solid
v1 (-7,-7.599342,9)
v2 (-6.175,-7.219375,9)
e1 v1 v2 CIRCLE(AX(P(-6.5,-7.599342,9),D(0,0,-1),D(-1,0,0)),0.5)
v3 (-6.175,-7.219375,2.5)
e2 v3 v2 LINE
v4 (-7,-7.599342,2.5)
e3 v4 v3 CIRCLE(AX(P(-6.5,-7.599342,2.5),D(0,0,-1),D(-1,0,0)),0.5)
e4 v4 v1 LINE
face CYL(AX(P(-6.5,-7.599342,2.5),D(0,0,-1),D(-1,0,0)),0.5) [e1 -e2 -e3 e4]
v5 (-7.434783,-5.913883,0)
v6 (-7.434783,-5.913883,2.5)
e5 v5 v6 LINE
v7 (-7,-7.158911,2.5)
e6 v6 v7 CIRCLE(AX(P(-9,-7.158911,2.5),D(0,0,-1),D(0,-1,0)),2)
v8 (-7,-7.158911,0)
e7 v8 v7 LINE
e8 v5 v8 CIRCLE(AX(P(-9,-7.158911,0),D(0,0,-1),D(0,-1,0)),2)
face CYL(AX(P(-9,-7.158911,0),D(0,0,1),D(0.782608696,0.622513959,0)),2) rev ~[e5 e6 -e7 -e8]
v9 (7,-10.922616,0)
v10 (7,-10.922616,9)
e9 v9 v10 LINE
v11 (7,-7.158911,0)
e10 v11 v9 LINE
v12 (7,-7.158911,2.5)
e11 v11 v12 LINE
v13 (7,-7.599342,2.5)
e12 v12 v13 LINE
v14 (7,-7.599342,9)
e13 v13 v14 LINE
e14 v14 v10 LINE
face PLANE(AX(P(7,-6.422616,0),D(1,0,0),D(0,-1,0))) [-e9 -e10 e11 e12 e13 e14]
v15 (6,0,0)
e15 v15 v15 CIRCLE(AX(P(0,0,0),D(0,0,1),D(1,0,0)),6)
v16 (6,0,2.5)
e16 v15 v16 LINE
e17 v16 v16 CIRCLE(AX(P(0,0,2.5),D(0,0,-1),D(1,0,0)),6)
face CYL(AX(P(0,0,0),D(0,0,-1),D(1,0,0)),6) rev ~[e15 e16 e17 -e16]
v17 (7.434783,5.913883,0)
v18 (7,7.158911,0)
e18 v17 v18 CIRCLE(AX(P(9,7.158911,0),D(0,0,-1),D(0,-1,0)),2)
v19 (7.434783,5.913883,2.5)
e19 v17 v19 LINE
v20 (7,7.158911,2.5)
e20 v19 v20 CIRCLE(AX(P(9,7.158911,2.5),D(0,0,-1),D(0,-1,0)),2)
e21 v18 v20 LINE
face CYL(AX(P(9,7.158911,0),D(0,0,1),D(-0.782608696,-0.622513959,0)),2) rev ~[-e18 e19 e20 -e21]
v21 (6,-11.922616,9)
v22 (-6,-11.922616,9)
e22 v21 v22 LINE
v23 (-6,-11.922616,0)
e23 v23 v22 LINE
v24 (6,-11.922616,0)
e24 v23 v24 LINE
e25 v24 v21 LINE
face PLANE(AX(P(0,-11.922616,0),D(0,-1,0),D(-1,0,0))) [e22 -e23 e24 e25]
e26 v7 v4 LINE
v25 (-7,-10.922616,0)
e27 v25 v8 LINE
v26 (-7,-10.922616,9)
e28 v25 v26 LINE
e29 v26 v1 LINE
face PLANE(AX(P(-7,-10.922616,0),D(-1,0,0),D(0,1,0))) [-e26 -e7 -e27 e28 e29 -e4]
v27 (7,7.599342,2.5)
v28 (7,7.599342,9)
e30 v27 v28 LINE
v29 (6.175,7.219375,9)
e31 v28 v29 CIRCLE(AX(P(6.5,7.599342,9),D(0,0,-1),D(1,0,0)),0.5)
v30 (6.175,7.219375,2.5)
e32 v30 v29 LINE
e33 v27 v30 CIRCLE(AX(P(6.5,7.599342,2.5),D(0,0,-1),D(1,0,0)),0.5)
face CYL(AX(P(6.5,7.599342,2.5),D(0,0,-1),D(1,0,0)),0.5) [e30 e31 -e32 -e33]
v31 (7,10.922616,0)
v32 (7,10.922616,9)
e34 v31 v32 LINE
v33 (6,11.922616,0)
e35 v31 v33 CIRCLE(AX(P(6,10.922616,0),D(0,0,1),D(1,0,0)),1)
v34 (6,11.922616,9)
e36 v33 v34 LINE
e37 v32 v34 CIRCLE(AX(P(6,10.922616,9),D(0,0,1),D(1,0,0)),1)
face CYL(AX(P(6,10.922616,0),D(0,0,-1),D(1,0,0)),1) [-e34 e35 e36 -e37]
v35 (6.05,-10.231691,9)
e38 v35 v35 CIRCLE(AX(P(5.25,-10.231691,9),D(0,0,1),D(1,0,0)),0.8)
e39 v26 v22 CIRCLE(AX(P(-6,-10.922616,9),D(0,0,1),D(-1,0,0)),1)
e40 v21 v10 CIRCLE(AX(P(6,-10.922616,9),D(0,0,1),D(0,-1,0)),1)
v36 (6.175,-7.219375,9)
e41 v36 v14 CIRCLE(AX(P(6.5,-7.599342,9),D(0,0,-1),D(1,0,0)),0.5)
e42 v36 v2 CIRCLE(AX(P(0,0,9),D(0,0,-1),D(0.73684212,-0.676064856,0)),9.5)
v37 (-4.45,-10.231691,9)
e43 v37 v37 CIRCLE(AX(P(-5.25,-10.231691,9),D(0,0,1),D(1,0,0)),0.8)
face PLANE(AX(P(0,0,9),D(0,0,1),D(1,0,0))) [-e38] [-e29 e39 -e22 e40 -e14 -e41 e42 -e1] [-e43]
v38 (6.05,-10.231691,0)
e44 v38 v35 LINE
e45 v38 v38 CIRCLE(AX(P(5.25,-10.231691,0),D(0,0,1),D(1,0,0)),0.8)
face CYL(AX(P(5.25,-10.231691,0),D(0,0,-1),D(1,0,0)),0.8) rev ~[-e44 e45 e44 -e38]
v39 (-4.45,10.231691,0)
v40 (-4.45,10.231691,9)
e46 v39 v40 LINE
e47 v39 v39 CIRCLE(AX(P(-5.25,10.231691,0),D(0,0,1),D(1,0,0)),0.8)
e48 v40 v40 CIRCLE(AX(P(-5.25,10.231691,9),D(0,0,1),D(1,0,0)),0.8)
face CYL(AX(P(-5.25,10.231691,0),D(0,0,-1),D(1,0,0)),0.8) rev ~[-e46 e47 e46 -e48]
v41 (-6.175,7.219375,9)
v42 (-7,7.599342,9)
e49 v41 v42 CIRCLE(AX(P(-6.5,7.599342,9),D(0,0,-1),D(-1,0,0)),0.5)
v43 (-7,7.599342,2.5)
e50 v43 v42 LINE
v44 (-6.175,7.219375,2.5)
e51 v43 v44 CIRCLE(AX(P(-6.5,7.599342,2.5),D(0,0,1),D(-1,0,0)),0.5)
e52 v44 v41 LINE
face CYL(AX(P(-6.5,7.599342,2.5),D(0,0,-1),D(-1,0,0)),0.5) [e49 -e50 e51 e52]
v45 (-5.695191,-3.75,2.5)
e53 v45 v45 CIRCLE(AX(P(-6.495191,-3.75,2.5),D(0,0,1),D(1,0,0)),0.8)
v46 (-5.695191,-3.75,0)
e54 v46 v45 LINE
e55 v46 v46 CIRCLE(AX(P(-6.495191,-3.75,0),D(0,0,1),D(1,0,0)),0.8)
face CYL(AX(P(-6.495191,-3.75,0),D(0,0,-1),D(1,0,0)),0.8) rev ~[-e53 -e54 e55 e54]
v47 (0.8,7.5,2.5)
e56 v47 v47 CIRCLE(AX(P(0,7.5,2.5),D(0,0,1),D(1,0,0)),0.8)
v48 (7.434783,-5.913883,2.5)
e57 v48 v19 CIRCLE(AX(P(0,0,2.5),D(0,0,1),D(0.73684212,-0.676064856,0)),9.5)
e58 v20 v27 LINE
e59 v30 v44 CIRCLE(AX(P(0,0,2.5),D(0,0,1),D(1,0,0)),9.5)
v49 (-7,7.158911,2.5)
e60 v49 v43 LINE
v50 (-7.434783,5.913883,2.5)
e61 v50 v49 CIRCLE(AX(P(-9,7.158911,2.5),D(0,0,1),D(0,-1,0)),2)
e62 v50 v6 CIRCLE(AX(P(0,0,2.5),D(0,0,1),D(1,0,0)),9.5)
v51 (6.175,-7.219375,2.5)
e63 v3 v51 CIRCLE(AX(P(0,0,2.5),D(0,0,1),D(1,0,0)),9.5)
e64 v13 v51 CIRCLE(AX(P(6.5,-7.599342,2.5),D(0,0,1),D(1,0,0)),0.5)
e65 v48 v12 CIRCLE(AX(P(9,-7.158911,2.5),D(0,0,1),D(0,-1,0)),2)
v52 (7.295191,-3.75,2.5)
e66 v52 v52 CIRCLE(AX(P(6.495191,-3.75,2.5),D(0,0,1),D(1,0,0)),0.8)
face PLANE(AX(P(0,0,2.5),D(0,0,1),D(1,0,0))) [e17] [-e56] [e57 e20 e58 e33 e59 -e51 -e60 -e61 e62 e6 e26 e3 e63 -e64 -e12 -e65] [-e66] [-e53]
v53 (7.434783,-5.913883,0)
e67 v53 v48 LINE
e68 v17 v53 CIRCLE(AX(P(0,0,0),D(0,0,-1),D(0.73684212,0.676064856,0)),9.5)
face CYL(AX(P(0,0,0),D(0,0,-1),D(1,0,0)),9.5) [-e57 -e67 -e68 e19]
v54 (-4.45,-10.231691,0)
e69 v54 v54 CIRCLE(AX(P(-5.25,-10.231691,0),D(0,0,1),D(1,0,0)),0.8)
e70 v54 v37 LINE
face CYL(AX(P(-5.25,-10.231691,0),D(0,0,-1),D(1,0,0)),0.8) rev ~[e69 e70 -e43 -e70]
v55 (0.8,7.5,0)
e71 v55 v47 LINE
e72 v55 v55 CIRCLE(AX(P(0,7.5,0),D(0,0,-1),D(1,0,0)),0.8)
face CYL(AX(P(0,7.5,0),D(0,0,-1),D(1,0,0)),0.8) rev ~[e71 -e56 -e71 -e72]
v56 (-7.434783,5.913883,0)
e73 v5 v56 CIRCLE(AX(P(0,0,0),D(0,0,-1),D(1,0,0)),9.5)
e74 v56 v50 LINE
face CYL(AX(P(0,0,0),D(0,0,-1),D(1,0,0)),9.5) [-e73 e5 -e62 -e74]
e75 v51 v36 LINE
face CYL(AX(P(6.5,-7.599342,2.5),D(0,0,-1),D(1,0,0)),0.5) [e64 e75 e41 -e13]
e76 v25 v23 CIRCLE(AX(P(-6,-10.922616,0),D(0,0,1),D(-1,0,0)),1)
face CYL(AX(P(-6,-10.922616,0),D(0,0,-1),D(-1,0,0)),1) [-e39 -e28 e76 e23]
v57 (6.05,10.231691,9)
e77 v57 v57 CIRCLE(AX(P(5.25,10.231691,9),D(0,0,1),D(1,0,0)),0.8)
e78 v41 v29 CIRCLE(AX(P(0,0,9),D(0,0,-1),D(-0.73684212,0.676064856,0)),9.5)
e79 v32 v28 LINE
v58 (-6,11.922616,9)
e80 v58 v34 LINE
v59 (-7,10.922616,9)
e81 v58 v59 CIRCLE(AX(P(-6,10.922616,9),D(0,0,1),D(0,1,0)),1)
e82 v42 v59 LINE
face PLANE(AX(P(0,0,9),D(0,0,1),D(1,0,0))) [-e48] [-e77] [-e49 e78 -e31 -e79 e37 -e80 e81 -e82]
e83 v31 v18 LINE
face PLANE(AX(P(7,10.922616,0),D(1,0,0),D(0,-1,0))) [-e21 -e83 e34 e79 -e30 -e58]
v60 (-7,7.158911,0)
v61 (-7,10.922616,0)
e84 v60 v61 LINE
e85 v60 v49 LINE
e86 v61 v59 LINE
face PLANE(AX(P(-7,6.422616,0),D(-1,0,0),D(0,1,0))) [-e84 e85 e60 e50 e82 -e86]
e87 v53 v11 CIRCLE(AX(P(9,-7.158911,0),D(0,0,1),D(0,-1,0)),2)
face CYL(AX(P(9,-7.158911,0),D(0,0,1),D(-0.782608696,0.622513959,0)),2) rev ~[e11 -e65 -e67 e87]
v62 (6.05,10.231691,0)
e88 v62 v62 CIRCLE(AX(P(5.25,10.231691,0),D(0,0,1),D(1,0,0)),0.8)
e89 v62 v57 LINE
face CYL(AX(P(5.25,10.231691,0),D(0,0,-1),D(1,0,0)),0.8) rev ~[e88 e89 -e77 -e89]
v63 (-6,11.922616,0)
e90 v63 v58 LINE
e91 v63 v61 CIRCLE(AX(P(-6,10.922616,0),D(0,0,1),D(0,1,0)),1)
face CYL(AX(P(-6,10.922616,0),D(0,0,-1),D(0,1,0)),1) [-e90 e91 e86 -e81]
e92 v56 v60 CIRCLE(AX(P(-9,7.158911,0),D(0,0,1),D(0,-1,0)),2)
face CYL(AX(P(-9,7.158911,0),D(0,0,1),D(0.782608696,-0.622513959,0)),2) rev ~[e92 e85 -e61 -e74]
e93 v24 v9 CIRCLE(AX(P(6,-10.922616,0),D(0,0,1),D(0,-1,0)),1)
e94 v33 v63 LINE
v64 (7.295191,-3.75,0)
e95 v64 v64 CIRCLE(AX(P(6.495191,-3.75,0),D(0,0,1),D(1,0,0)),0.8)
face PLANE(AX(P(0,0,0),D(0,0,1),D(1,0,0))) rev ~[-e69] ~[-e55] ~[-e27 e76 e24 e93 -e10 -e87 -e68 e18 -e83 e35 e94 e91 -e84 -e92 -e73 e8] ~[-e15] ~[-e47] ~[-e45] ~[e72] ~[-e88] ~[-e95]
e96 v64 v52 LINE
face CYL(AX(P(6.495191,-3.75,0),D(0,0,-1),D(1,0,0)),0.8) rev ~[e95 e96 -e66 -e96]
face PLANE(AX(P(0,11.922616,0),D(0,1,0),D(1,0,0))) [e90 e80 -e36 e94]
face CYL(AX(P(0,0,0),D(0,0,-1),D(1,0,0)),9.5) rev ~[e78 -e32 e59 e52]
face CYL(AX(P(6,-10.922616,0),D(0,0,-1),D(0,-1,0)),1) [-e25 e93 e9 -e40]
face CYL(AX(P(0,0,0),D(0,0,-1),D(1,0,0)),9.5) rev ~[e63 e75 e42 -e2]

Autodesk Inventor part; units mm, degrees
ref_plane "YZ Plane" through (0, 0, 0) normal (1, 0, 0) x (0, 1, 0)
ref_plane "XZ Plane" through (0, 0, 0) normal (0, 1, 0) x (-1, 0, 0)
ref_plane "XY Plane" through (0, 0, 0) normal (0, 0, 1) x (1, 0, 0)
sketch "スケッチ1" plane through (0, 0, 0) normal (0, 0, 1) x (1, 0, 0)
  circle A0 centre (0, 0) radius 2.5
  circle A1 centre (0, 0) radius 6
  circle A2 centre (0, 0) radius 9.5
  circle A3 centre (0, 7.5) radius 0.8
  circle A4 centre (0, 0) radius 7.5 construction
  line L0 (0, -20.3) -> (0, 20.3)
  circle A5 centre (-6.495191, -3.75) radius 0.8
  circle A6 centre (6.495191, -3.75) radius 0.8
  circle A7 centre (0, 0) radius 14.5 construction
  line L1 (-7, 6.422616) -> (-7, 10.922616)
  line L2 (-6, 11.922616) -> (6, 11.922616)
  line L3 (7, 10.922616) -> (7, 6.422616)
  arc A8 (-6, 11.922616) -> (-7, 10.922616) centre (-6, 10.922616) ccw
  arc A9 (7, 10.922616) -> (6, 11.922616) centre (6, 10.922616) ccw
  circle A10 centre (5.25, 10.231691) radius 2 construction
  circle A11 centre (5.25, 10.231691) radius 0.8
  circle A12 centre (-5.25, 10.231691) radius 2 construction
  circle A13 centre (-5.25, 10.231691) radius 0.8
  line L4 (-5.25, 10.231691) -> (-5.25, 7.917544) construction
  line L5 (5.25, 10.231691) -> (5.25, 7.917544) construction
  circle A14 centre (5.25, -10.231691) radius 0.8
  line L6 (7, -6.422616) -> (7, -10.922616)
  arc A15 (6, -11.922616) -> (7, -10.922616) centre (6, -10.922616) ccw
  line L7 (6, -11.922616) -> (-6, -11.922616)
  circle A16 centre (-5.25, -10.231691) radius 2 construction
  line L8 (-7, -10.922616) -> (-7, -6.422616)
  arc A17 (-7, -10.922616) -> (-6, -11.922616) centre (-6, -10.922616) ccw
  circle A18 centre (-5.25, -10.231691) radius 0.8
  circle A19 centre (5.25, -10.231691) radius 2 construction
  dimension "d4" = 15
  dimension "d0" = 5
  dimension "d1" = 12
  dimension "d2" = 19
  dimension "d3" = 1.6
  dimension "d7" = 360
  dimension "d13" = 29
  dimension "d14" = 1
  dimension "d15" = 12
  dimension "d16" = 4.5
  dimension "d17" = 4
  dimension "d18" = 1.6
  dimension "d19" = 10.5
  dimension "d22" = 360
extrude "押し出し1" add sketch "スケッチ1" along normal blind 1.25 contours L0 A3 A2 A1 | A1 L0 A2 A3
extrude "押し出し2" add sketch "スケッチ1" along normal blind 2.5 contours L0 A3 A2 A1 | A1 L0 A2 A3
extrude "押し出し3" add sketch "スケッチ1" along normal blind 9 contours L0 L7 A17 L8 A2 | A2 L6 A15 L7 L0 | L0 L2 A9 L3 A2 | A2 L1 A8 L2 L0
fillet "フィレット1" radius 2 4 edges at (-7, 6.4226, 1.25) (-7, -6.4226, 1.25) (7, 6.4226, 1.25) (7, -6.4226, 1.25)
fillet "フィレット2" radius 0.5 4 edges at (7, 6.4226, 5.75) (7, -6.4226, 5.75) (-7, -6.4226, 5.75) (-7, 6.4226, 5.75)
properties part number "MotorMount_sub"
